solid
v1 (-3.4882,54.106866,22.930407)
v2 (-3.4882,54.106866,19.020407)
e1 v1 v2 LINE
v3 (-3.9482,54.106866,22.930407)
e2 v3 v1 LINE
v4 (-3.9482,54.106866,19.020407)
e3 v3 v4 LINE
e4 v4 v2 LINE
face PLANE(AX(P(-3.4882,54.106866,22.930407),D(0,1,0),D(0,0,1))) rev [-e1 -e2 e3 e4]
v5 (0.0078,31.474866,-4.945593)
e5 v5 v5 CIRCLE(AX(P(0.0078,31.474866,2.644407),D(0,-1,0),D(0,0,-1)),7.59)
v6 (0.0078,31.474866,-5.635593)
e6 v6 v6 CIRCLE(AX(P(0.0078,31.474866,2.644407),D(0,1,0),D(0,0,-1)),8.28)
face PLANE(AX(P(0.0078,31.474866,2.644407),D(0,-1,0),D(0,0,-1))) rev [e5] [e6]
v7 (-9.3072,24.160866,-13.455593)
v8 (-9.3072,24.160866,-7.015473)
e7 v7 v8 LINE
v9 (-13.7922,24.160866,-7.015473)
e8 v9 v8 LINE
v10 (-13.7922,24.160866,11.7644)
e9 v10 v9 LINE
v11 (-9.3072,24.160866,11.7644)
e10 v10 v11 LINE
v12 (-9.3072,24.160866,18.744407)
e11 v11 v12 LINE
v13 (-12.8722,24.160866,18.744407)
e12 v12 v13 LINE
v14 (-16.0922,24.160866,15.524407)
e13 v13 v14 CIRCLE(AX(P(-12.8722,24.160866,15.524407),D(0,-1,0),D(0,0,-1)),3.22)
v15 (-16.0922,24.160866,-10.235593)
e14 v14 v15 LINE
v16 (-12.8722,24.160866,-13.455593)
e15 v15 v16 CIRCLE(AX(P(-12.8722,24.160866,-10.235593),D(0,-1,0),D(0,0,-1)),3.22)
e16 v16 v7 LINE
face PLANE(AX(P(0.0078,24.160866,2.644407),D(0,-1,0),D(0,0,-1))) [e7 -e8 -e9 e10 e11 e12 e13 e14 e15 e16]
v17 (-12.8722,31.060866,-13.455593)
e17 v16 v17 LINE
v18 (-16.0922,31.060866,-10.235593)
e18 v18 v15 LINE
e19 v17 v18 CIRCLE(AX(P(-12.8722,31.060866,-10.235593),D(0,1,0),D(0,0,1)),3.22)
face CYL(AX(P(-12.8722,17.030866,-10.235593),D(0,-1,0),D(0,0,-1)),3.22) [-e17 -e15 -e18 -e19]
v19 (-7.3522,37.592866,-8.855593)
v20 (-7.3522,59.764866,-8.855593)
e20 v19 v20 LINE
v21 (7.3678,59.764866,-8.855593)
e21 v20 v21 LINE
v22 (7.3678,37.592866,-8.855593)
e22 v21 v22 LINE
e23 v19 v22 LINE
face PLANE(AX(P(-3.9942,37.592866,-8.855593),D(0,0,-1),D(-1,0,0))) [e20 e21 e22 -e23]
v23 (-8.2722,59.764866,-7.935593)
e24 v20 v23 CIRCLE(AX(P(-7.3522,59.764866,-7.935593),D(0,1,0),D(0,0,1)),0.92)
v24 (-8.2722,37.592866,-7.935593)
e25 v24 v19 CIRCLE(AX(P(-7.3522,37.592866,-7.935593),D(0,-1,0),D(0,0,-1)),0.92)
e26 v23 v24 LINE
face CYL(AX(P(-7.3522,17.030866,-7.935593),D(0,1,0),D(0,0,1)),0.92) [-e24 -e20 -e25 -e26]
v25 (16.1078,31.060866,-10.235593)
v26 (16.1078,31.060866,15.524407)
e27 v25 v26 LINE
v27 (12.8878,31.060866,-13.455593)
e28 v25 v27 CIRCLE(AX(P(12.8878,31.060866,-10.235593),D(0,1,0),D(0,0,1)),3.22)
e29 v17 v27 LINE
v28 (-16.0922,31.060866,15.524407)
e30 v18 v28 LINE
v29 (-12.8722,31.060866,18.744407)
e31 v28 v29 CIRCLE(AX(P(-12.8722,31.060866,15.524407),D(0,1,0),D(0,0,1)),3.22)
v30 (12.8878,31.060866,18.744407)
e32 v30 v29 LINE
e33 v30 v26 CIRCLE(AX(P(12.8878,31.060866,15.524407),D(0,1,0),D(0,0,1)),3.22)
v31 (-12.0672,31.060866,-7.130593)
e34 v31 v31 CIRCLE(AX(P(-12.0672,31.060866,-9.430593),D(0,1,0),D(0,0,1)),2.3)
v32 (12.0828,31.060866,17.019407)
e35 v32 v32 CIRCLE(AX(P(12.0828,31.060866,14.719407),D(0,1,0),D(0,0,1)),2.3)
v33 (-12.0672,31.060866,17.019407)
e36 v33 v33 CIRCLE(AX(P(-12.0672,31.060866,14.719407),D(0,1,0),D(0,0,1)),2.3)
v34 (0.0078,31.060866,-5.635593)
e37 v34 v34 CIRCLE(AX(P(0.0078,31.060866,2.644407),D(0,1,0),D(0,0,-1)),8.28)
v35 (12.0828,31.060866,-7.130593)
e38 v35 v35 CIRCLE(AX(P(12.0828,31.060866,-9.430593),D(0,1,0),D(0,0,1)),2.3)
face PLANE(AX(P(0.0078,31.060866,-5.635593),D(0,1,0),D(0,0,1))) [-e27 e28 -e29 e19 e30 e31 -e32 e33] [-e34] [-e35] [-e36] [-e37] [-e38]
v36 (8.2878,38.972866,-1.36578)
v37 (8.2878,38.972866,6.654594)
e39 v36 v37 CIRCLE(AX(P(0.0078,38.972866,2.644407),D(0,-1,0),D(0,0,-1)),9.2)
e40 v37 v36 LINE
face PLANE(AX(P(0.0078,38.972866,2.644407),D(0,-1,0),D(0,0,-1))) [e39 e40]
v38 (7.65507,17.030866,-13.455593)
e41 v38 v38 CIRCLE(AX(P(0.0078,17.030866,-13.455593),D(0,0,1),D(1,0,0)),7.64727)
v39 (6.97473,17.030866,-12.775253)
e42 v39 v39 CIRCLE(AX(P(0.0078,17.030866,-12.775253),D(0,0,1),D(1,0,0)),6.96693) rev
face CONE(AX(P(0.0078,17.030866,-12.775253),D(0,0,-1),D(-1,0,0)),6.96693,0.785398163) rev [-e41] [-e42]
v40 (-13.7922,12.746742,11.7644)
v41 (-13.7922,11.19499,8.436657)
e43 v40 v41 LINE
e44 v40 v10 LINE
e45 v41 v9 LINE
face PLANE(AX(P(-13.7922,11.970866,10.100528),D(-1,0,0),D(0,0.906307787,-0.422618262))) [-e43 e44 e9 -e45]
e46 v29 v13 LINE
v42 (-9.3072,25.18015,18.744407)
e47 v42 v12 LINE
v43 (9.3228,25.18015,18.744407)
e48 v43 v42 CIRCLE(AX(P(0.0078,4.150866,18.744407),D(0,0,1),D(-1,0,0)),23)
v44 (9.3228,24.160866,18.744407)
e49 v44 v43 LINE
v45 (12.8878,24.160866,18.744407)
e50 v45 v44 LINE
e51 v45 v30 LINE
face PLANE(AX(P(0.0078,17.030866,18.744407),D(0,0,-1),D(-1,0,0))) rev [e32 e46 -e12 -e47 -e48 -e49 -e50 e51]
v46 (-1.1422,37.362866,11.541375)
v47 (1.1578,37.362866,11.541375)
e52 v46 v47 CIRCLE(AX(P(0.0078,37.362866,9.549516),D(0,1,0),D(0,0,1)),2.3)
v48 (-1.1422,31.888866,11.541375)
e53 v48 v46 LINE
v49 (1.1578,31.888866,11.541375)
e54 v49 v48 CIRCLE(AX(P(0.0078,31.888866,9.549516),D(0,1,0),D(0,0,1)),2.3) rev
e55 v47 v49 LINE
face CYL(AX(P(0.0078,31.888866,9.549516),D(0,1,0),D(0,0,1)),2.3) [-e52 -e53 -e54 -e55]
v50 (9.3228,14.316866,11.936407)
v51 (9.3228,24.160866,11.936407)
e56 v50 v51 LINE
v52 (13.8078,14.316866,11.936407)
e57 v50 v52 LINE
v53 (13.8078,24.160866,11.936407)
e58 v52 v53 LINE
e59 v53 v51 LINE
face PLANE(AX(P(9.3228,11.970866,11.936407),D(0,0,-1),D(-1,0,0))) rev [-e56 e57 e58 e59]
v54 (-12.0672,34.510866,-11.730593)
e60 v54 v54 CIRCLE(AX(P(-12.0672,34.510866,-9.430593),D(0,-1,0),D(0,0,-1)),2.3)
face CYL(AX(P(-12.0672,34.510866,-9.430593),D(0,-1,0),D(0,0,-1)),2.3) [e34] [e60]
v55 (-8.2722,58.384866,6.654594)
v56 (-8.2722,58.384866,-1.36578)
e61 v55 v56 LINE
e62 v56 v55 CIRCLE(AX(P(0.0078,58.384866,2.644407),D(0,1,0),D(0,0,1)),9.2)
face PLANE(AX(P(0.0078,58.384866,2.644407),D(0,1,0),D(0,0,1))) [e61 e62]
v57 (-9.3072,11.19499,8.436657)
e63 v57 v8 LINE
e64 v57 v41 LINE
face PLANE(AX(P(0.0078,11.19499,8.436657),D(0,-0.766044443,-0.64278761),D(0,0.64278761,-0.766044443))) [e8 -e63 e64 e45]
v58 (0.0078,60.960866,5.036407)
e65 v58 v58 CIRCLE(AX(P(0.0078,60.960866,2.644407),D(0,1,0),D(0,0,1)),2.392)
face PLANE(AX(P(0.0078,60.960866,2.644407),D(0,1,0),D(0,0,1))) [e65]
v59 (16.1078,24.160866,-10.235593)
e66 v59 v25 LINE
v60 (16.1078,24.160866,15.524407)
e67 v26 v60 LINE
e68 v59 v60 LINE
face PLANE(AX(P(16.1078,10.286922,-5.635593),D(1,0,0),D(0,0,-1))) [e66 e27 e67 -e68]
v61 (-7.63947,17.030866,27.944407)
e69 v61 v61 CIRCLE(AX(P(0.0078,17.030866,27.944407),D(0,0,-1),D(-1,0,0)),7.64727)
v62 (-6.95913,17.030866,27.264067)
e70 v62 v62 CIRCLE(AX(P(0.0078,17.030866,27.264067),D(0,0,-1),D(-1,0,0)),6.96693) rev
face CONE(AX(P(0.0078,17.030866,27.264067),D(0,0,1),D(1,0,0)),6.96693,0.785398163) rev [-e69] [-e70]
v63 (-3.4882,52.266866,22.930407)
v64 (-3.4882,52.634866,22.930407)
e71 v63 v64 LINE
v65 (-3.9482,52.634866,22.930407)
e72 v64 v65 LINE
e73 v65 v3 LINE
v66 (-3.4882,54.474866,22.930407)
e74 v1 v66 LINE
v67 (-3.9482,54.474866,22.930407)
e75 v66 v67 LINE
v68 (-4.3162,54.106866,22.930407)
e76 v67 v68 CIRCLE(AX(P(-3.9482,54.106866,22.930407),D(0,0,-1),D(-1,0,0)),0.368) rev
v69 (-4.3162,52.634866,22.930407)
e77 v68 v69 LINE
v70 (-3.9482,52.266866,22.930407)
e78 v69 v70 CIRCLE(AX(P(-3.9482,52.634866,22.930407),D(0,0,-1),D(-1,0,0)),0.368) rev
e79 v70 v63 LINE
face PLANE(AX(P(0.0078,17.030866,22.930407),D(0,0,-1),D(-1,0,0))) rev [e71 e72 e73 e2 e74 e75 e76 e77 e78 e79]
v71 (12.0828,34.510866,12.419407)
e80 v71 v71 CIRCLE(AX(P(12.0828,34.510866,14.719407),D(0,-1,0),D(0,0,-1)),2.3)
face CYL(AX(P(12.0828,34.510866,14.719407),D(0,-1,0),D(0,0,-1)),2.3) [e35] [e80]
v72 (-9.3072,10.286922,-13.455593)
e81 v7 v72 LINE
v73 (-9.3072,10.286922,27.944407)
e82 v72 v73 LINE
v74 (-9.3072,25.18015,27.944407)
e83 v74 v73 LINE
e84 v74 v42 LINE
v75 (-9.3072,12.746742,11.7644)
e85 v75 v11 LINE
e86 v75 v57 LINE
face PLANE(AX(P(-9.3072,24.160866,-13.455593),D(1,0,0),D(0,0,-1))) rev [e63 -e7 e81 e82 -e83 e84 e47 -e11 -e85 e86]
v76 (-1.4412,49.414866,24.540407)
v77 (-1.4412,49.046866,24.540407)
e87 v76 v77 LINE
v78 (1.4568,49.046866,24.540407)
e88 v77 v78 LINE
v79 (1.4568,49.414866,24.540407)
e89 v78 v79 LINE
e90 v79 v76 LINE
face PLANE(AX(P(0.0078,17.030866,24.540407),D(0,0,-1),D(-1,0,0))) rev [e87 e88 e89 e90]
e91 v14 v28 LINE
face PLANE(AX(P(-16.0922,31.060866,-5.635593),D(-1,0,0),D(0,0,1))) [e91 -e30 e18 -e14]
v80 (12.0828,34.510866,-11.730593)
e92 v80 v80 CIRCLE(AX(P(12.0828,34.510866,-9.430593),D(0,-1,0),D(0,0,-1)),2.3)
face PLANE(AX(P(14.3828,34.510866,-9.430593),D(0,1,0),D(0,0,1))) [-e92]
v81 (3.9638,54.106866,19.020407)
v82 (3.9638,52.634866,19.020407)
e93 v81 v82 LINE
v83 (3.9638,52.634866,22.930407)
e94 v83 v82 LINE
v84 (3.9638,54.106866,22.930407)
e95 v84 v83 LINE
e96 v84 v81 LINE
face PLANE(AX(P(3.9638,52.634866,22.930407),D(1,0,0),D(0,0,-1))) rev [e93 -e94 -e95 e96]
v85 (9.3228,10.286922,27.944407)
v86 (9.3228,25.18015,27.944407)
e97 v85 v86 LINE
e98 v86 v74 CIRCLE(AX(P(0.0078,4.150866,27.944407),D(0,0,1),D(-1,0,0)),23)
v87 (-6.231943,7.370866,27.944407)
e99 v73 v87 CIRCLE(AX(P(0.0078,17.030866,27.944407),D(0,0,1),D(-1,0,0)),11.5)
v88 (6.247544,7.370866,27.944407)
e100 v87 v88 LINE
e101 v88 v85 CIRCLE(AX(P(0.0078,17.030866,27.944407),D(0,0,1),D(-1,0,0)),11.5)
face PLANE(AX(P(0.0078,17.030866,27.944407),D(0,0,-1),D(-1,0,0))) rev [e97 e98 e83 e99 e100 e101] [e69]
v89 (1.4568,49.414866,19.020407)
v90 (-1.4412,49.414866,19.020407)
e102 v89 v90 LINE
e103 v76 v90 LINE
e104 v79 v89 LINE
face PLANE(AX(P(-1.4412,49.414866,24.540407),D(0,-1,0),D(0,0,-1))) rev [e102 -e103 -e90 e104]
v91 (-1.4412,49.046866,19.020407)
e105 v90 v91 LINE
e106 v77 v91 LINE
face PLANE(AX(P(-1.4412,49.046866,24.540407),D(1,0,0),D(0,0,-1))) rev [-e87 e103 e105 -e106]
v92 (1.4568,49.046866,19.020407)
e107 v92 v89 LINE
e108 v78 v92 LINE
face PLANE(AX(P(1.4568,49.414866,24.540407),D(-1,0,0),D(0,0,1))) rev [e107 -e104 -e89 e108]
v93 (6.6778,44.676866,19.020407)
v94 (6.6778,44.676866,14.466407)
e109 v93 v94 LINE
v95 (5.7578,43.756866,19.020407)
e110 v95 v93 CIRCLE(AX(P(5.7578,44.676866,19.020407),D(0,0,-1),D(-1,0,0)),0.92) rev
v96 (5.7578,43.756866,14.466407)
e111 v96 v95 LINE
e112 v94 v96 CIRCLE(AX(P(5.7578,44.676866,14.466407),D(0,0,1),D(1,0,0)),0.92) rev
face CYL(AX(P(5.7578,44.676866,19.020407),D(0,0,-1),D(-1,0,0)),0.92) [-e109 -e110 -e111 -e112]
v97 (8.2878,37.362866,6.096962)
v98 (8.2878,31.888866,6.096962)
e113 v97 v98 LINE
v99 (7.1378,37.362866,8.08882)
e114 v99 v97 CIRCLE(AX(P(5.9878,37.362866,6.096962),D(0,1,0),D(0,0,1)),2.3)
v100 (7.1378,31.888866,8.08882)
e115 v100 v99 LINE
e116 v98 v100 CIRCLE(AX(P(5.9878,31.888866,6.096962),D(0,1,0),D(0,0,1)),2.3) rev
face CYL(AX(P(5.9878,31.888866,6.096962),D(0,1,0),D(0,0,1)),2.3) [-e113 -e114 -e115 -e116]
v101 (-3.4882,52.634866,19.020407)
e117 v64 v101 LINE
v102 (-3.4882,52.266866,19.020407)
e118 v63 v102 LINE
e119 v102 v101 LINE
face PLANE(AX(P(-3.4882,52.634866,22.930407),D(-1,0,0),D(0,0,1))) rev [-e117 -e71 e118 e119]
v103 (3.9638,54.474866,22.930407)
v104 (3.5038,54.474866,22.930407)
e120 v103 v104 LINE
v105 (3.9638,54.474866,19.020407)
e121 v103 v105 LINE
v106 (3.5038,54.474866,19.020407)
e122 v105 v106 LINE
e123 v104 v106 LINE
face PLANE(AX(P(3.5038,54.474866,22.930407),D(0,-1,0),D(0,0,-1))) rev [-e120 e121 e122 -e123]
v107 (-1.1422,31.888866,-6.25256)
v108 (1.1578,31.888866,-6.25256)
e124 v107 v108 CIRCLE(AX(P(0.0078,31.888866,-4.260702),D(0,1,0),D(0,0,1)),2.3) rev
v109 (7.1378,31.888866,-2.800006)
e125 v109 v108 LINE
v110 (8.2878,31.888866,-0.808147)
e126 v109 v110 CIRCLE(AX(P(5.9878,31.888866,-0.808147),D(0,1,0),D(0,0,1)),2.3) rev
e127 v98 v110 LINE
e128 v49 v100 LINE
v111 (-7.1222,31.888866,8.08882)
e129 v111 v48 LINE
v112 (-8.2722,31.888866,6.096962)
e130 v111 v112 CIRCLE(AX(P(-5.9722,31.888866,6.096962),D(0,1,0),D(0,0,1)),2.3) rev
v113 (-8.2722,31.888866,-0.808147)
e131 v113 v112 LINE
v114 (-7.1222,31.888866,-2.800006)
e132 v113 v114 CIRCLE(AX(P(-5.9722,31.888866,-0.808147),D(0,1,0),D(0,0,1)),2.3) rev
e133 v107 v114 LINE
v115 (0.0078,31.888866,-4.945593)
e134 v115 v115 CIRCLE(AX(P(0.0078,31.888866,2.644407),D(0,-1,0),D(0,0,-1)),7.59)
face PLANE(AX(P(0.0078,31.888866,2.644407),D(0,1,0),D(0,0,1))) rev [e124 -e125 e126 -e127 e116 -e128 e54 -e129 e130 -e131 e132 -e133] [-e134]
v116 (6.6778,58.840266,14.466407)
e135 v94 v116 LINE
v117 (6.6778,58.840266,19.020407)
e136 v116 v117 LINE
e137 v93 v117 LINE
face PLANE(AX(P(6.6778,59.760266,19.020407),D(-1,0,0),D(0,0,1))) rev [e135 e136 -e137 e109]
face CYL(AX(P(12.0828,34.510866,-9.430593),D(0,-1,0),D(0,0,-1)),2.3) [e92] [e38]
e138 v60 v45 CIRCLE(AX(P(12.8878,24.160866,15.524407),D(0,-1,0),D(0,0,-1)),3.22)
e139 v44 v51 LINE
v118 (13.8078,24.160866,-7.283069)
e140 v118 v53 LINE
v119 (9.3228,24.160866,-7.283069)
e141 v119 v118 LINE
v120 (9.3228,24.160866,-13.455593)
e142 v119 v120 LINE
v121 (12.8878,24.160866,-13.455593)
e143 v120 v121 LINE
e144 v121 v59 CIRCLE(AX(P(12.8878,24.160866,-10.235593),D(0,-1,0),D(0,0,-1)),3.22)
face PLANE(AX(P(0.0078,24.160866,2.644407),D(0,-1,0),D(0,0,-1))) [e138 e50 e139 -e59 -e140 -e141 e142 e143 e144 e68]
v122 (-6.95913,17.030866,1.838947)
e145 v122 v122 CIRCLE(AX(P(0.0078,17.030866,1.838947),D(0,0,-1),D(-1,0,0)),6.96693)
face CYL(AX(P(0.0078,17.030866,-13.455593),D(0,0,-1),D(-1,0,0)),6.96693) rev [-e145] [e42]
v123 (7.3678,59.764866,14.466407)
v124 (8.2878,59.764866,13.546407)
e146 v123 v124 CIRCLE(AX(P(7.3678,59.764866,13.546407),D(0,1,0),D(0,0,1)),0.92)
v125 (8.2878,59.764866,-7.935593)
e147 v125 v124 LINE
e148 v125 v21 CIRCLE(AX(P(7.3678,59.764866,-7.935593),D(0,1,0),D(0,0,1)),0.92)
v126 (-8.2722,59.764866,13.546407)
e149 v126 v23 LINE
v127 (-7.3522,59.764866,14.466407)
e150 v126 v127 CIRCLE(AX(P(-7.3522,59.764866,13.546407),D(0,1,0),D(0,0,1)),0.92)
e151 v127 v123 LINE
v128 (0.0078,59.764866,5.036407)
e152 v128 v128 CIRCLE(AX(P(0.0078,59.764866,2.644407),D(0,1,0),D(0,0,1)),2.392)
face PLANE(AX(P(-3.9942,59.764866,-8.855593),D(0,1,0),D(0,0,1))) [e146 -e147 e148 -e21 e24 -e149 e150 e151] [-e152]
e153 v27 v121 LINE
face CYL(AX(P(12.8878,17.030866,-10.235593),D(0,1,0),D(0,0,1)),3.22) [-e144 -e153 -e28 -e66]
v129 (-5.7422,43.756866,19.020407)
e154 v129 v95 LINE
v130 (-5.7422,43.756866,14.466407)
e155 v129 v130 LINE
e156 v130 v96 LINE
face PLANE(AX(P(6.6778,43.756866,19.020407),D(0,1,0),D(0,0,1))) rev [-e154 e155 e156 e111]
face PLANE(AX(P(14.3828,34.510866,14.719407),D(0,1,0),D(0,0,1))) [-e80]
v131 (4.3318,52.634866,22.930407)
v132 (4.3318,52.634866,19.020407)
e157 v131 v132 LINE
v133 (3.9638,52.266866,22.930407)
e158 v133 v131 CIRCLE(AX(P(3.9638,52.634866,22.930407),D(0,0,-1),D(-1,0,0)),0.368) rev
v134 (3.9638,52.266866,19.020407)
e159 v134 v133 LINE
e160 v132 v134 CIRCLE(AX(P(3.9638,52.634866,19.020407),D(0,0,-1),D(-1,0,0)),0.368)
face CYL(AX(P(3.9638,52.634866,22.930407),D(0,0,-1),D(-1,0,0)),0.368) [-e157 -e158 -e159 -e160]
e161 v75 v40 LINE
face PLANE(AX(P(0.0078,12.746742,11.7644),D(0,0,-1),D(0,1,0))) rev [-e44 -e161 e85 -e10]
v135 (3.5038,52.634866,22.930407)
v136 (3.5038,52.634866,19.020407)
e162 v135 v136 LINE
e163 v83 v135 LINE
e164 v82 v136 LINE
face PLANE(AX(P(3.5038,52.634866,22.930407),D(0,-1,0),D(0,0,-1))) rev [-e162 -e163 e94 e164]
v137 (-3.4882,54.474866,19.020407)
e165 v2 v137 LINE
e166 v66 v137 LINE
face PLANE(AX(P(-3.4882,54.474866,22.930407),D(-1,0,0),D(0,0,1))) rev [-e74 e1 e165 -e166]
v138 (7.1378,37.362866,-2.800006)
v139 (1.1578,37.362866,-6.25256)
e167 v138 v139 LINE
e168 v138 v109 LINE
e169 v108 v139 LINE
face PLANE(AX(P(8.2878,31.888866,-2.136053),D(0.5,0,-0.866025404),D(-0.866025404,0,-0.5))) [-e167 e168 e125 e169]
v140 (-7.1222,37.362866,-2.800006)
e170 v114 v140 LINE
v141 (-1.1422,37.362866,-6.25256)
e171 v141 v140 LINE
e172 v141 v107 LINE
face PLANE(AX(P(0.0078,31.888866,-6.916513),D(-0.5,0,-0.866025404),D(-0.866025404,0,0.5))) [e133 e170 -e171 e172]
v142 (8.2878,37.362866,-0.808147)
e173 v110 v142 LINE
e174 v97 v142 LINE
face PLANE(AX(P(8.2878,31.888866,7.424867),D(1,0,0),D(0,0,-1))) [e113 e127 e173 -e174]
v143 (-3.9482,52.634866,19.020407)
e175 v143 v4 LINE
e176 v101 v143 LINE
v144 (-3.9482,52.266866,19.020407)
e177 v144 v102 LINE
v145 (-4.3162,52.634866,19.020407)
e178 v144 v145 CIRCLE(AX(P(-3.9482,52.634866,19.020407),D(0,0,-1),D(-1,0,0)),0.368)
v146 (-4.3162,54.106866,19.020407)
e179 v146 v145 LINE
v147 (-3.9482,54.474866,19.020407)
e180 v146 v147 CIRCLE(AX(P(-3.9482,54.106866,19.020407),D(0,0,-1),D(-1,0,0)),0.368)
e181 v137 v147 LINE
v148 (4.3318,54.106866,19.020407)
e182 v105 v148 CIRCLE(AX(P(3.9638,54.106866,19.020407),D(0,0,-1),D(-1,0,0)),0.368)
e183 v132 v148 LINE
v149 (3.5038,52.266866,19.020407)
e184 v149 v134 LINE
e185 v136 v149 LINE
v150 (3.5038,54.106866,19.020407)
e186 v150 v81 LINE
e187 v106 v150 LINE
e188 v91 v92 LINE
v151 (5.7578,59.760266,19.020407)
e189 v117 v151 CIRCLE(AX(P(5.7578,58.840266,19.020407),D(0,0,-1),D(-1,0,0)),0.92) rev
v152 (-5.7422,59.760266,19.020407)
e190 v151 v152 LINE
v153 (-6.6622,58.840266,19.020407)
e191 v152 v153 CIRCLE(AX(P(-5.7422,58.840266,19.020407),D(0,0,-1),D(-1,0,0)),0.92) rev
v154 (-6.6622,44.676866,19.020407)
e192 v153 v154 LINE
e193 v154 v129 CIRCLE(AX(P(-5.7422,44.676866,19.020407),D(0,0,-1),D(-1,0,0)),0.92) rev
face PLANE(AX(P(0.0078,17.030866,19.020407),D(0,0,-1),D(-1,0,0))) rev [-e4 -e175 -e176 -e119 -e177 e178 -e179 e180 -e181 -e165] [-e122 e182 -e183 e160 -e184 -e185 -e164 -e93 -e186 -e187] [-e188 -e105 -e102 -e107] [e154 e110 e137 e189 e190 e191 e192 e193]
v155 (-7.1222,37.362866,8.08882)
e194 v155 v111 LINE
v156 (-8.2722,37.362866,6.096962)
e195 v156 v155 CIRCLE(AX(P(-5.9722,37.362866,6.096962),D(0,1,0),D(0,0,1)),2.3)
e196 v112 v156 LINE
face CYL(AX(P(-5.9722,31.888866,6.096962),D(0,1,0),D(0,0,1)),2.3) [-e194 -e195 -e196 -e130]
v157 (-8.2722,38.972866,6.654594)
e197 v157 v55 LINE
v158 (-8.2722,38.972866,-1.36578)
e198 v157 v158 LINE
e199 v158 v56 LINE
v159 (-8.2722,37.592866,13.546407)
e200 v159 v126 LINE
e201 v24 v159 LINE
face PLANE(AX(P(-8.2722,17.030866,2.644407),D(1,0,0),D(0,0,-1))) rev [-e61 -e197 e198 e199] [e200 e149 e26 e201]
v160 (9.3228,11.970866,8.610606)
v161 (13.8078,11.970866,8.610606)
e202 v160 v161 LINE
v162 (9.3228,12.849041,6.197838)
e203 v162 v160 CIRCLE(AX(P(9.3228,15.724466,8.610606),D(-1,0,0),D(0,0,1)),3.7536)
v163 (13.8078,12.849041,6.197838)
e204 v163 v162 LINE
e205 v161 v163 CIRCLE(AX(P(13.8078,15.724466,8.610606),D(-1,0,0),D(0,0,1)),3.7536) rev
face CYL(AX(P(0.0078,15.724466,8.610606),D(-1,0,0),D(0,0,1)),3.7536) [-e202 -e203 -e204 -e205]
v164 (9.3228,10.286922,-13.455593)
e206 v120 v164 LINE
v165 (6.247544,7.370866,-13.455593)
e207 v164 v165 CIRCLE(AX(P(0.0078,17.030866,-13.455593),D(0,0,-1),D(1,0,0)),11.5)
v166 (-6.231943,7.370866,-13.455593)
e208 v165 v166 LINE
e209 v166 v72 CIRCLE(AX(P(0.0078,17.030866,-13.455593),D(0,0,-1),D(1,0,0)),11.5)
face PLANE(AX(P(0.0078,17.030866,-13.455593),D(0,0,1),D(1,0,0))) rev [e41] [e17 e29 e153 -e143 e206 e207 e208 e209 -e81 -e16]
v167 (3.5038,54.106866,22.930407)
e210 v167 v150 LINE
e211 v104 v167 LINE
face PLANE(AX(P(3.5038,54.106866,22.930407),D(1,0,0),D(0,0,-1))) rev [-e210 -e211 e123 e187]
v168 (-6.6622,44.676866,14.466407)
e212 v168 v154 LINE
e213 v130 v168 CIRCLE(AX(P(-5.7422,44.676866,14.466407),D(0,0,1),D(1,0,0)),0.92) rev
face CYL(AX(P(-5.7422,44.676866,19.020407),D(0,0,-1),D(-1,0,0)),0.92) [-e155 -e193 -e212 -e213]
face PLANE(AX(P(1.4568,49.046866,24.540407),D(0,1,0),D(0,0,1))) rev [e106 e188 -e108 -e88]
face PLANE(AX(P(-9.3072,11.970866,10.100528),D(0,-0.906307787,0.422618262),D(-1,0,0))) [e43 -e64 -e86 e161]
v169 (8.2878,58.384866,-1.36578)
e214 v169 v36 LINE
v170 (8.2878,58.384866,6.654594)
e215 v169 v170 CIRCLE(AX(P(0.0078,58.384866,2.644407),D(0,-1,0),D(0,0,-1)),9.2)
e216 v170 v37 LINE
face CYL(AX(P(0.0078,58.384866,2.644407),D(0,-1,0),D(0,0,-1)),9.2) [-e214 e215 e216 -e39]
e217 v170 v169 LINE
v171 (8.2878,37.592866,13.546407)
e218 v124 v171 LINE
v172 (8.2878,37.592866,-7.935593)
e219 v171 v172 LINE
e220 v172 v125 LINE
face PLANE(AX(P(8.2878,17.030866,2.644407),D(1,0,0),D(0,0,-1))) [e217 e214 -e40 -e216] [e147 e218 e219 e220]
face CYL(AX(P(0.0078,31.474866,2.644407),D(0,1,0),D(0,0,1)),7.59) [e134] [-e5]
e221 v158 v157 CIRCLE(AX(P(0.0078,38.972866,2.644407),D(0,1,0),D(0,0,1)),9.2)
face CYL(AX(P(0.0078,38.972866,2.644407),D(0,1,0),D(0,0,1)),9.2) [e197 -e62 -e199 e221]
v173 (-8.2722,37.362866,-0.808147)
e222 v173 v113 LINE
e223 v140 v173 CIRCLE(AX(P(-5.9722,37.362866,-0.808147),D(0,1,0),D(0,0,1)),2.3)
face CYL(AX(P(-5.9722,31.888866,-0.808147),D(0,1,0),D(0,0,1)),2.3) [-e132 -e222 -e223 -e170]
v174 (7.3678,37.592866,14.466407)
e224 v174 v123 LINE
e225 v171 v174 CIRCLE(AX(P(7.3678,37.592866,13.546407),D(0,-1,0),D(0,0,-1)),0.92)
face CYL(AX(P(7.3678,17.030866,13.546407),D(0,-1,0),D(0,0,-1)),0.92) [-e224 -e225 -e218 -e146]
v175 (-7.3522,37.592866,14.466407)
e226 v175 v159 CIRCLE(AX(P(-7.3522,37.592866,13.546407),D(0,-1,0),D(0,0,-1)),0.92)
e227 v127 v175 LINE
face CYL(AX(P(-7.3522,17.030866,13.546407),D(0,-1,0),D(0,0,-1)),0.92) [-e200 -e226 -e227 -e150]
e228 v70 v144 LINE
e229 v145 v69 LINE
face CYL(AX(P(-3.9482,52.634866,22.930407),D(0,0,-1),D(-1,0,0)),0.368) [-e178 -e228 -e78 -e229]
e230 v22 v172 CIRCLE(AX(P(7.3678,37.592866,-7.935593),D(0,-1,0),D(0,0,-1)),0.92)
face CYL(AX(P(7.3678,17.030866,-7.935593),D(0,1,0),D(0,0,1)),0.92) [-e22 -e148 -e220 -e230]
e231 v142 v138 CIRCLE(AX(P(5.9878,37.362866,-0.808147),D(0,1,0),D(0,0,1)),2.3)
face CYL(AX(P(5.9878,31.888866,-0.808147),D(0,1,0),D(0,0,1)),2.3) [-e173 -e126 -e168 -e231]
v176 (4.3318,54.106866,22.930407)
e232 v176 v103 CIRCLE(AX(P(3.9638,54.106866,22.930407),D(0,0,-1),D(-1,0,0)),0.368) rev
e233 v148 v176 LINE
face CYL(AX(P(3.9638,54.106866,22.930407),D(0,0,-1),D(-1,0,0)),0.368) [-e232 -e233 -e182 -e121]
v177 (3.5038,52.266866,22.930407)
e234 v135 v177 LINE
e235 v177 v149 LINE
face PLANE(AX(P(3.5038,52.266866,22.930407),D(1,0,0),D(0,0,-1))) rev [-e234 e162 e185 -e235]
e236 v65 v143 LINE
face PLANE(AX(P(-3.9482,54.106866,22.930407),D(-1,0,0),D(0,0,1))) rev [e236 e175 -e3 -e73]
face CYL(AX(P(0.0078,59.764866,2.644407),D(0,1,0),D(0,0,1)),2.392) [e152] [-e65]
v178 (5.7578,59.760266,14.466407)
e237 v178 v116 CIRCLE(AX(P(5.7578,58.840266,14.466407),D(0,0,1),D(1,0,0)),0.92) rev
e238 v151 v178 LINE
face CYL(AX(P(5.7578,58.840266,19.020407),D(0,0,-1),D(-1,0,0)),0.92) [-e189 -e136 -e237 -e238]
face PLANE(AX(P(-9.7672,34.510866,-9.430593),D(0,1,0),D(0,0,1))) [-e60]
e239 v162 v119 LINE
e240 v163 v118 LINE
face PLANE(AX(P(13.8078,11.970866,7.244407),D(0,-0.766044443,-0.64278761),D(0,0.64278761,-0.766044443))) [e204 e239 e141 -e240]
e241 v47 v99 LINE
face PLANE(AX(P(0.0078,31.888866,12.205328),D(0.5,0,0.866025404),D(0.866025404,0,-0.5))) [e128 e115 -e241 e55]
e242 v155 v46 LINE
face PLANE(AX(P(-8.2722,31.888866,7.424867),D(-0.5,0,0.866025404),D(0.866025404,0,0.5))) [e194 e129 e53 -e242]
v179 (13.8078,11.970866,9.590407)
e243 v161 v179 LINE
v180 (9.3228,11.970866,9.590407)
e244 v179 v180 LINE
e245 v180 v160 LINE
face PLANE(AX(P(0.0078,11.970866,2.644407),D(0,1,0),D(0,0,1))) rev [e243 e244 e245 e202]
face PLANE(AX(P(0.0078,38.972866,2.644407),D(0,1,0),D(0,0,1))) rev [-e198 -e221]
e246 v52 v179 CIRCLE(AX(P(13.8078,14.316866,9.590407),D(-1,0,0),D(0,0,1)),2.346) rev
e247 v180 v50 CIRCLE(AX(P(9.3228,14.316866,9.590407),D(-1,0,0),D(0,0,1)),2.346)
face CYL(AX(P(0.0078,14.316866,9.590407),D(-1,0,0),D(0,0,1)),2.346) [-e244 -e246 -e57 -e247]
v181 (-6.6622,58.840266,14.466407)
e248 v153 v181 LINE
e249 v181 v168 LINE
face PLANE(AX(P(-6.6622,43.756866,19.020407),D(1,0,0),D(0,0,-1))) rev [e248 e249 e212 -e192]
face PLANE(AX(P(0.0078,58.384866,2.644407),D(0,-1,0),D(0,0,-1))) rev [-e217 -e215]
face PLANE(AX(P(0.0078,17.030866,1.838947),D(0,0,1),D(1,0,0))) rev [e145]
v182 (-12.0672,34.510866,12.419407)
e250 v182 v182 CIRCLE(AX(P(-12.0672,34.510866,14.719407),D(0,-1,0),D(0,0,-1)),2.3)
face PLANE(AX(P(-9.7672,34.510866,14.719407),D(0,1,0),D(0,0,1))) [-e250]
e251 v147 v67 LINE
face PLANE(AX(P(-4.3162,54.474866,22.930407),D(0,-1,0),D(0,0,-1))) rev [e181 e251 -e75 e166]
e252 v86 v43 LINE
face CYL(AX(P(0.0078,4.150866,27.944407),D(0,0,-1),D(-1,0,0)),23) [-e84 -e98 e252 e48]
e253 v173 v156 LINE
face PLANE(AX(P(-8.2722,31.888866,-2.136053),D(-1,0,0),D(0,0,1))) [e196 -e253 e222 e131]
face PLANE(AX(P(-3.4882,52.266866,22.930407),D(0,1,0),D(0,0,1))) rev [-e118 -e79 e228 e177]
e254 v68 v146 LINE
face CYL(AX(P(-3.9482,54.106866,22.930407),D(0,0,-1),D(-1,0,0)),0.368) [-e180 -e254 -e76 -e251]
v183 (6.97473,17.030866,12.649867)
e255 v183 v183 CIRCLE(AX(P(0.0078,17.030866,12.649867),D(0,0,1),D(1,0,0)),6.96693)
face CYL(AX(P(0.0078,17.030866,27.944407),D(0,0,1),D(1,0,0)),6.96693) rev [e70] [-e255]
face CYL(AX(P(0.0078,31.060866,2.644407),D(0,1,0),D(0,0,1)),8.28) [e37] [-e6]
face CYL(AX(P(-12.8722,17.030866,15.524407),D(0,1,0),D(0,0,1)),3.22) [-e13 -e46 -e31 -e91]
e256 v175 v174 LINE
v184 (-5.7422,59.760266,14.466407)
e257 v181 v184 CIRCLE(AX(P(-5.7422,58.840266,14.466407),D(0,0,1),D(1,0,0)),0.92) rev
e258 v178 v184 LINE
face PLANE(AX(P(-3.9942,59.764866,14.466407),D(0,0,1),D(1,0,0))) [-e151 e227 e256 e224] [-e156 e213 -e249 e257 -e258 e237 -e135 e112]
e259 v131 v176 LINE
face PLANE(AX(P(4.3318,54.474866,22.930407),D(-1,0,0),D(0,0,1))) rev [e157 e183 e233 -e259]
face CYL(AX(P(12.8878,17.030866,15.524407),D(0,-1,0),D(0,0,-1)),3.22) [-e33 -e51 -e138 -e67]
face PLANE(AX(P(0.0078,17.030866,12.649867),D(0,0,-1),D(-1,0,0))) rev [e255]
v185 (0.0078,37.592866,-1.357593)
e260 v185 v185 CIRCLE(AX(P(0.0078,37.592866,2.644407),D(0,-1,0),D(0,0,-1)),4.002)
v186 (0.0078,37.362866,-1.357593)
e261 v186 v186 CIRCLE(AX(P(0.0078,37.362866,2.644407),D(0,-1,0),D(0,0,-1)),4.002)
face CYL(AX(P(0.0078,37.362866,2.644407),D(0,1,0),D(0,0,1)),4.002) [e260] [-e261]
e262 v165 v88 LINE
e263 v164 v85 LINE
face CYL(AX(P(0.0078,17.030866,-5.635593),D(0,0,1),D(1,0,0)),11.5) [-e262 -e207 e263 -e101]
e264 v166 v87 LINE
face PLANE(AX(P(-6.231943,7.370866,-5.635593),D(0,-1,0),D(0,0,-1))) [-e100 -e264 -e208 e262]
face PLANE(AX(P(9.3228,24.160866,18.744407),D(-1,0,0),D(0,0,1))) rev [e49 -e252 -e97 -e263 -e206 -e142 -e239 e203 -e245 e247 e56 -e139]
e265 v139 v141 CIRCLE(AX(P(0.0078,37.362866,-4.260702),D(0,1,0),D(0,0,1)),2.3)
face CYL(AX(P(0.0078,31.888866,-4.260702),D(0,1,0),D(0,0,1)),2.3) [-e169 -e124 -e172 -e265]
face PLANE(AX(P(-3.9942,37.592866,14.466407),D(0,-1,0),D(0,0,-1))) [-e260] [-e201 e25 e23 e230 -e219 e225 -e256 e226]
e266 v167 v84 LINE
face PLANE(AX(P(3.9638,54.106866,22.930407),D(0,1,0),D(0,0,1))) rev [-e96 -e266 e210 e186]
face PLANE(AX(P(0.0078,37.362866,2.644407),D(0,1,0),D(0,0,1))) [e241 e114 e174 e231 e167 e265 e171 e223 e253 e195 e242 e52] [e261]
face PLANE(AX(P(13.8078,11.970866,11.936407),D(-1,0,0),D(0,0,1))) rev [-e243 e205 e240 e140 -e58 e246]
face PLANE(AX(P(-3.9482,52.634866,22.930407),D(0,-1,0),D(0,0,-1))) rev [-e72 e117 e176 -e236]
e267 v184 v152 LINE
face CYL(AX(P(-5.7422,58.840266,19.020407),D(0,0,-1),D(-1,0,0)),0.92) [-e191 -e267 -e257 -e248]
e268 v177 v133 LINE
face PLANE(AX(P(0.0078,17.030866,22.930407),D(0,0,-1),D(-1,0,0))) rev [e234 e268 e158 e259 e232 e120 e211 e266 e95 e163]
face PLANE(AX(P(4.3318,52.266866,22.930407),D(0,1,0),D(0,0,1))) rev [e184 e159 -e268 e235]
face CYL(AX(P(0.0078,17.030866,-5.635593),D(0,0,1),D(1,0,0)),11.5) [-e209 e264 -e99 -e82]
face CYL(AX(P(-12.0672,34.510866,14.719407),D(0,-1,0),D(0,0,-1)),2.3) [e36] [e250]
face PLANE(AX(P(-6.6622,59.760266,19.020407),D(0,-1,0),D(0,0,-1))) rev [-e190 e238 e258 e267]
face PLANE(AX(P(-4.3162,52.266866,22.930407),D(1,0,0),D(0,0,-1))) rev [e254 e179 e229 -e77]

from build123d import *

# Parameters (mm, degrees)
IZIM1_W                      = 50.7
IZIM1_H                      = 48.2
Y_KSEKLIK_EKSTR_ZYON1_DEPTH  = 26.7
IZIM2_R                      = 8.7
Y_KSEKLIK_EKSTR_ZYON2_DEPTH  = 0.5
Y_KSEKLIK_EKSTR_ZYON3_DEPTH  = 11.9
IZIM4_R                      = 16.5
Y_KSEKLIK_EKSTR_ZYON4_DEPTH  = 0.9
IZIM5_R                      = 18
Y_KSEKLIK_EKSTR_ZYON5_DEPTH  = 0.9
Y_KSEKLIK_EKSTR_ZYON6_DEPTH  = 36
Y_KSEKLIK_EKSTR_ZYON7_DEPTH  = 17
Y_KSEKLIK_EKSTR_ZYON8_START  = 17
Y_KSEKLIK_EKSTR_ZYON8_DEPTH  = 17
IZIM9_W                      = 14.75
IZIM9_H                      = 70
KES_EKSTR_ZYON1_DEPTH        = 30.160746911
IZIM10_W                     = 14.75
IZIM10_H                     = 70
KES_EKSTR_ZYON2_DEPTH        = 30.160746911
IZIM11_W                     = 50.7
IZIM11_H                     = 48.2
Y_KSEKLIK_EKSTR_ZYON9_DEPTH  = 9.3
Y_KSEKLIK_EKSTR_ZYON10_START = 20
Y_KSEKLIK_EKSTR_ZYON10_DEPTH = 20
IZIM13_W                     = 9.75
IZIM13_H                     = 10.2
Y_KSEKLIK_EKSTR_ZYON11_DEPTH = 26.5
Y_KSEKLIK_EKSTR_ZYON12_DEPTH = 42.2
Y_KSEKLIK_EKSTR_ZYON13_START = -42.2
Y_KSEKLIK_EKSTR_ZYON13_DEPTH = 42.2
IZIM16_W                     = 29
IZIM16_H                     = 34.79
Y_KSEKLIK_EKSTR_ZYON14_DEPTH = 9.9
Y_KSEKLIK_EKSTR_ZYON15_DEPTH = 8.5
Y_KSEKLIK_EKSTR_ZYON16_DEPTH = 8.5
IZIM19_W                     = 6.3
IZIM19_H                     = 0.8
Y_KSEKLIK_EKSTR_ZYON17_DEPTH = 12
DRAFT1_ANGLE                 = 50
IZIM20_W                     = 5
IZIM20_H                     = 7.5
IZIM21_W                     = 5
IZIM21_H                     = 7.5
IZIM22_W                     = 5
IZIM22_H                     = 7.5
IZIM23_W                     = 5
IZIM23_H                     = 7.5
IZIM24_W                     = 5.2
IZIM24_H                     = 2.6
M27_BO_LUKLU_DELIK1_D        = 30.291
M27_BO_LUKLU_DELIK1_DEPTH    = 33.249
M27_BO_LUKLU_DELIK2_D        = 30.291
M27_BO_LUKLU_DELIK2_DEPTH    = 33.249
FEDER1_START                 = -30
FEDER1_DEPTH                 = 9.75
PAH1_SIZE                    = 1.479
RADYUS1_R                    = 0.8
RADYUS2_R                    = 2
RADYUS3_R                    = 5
RADYUS4_R                    = 5.1
RADYUS5_R                    = 7
RADYUS6_R                    = 8.16
L_EK1_SCALE                  = 0.46


# Read off the part's stored shape, not the designer's step: Feder1
with BuildPart() as part:
    # Çizim1 → Yükseklik-Ekstrüzyon1 (new body)
    with BuildSketch(Plane(origin=(18, 0, 0), x_dir=(0, 0, -1), z_dir=(1, 0, 0))):
        with Locations((-0.35, 68.8)):
            Rectangle(IZIM1_W, IZIM1_H)
    extrude(amount=-Y_KSEKLIK_EKSTR_ZYON1_DEPTH)

    # Çizim2 → Yükseklik-Ekstrüzyon2 (add)
    with BuildSketch(Plane.XZ.offset(-44.7)):
        with Locations(Location((0, 0, 0), (0, 0, 180))):
            Circle(IZIM2_R)
    extrude(amount=Y_KSEKLIK_EKSTR_ZYON2_DEPTH)

    # Çizim3 → Yükseklik-Ekstrüzyon3 (add)
    with BuildSketch(Plane(origin=(0, 44.2, 0), x_dir=(1, 0, 0), z_dir=(0, 1, 0))):
        Polygon((-18, 10.392304845), (-18, -10.392304845), (0, -20.784609691), (18, -10.392304845), (18, 10.392304845), (0, 20.784609691), align=None)
    extrude(amount=-Y_KSEKLIK_EKSTR_ZYON3_DEPTH)

    # Çizim4 → Yükseklik-Ekstrüzyon4 (add)
    with BuildSketch(Plane.XZ.offset(-32.3)):
        with Locations(Location((0, 0, 0), (0, 0, 270))):
            Circle(IZIM4_R)
    extrude(amount=Y_KSEKLIK_EKSTR_ZYON4_DEPTH)

    # Çizim5 → Yükseklik-Ekstrüzyon5 (add)
    with BuildSketch(Plane(origin=(0, 31.4, 0), x_dir=(1, 0, 0), z_dir=(0, 1, 0))):
        with Locations(Location((0, 0, 0), (0, 0, 90))):
            Circle(IZIM5_R)
    extrude(amount=-Y_KSEKLIK_EKSTR_ZYON5_DEPTH)

    # Çizim6 → Yükseklik-Ekstrüzyon6 (add)
    with BuildSketch(Plane.XY.offset(18)):
        with BuildLine():
            Line((-13.564659966, -21), (13.564659966, -21))
            ThreePointArc((13.564659966, -21), (17.201870235, -18.14099392), (20.25, -14.660746911))
            Line((20.25, -14.660746911), (35, -14.660746911))
            Line((35, -14.660746911), (35, 30.5))
            Line((35, 30.5), (0, 30.5))
            Line((0, 30.5), (-35, 30.5))
            Line((-35, 30.5), (-35, -14.660746911))
            Line((-35, -14.660746911), (-20.25, -14.660746911))
            ThreePointArc((-20.25, -14.660746911), (-17.201870235, -18.14099392), (-13.564659966, -21))
        make_face()
    extrude(amount=-Y_KSEKLIK_EKSTR_ZYON6_DEPTH)

    # Çizim7 → Yükseklik-Ekstrüzyon7 (add)
    with BuildSketch(Plane(origin=(0, 0, -18), x_dir=(-1, 0, 0), z_dir=(0, 0, -1))):
        with BuildLine():
            Line((13.564659966, -21), (-13.564659966, -21))
            ThreePointArc((-13.564659966, -21), (-17.201870235, -18.14099392), (-20.25, -14.660746911))
            Line((-20.25, -14.660746911), (-35, -14.660746911))
            Line((-35, -14.660746911), (-35, 30.5))
            Line((-35, 30.5), (35, 30.5))
            Line((35, 30.5), (35, -14.660746911))
            Line((35, -14.660746911), (20.25, -14.660746911))
            ThreePointArc((20.25, -14.660746911), (17.201870235, -18.14099392), (13.564659966, -21))
        make_face()
    extrude(amount=Y_KSEKLIK_EKSTR_ZYON7_DEPTH)

    # Çizim8 → Yükseklik-Ekstrüzyon8 (add)
    with BuildSketch(Plane.XY.offset(18).offset(Y_KSEKLIK_EKSTR_ZYON8_START)):
        with BuildLine():
            Line((13.564659966, -21), (-13.564659966, -21))
            ThreePointArc((-13.564659966, -21), (-17.201870235, -18.14099392), (-20.25, -14.660746911))
            Line((-20.25, -14.660746911), (-35, -14.660746911))
            Line((-35, -14.660746911), (-35, 30.5))
            Line((-35, 30.5), (35, 30.5))
            Line((35, 30.5), (35, -14.660746911))
            Line((35, -14.660746911), (20.25, -14.660746911))
            ThreePointArc((20.25, -14.660746911), (17.201870235, -18.14099392), (13.564659966, -21))
        make_face()
    extrude(amount=-Y_KSEKLIK_EKSTR_ZYON8_DEPTH)

    # Çizim9 → Kes-Ekstrüzyon1 (cut)
    with BuildSketch(Plane.XZ.offset(14.660746911)):
        with Locations((27.625, 0)):
            Rectangle(IZIM9_W, IZIM9_H)
    extrude(amount=-KES_EKSTR_ZYON1_DEPTH, mode=Mode.SUBTRACT)

    # Çizim10 → Kes-Ekstrüzyon2 (cut)
    with BuildSketch(Plane.XZ.offset(14.660746911)):
        with Locations((-27.625, 0)):
            Rectangle(IZIM10_W, IZIM10_H)
    extrude(amount=-KES_EKSTR_ZYON2_DEPTH, mode=Mode.SUBTRACT)

    # Çizim11 → Yükseklik-Ekstrüzyon9 (add)
    with BuildSketch(Plane.ZY.offset(8.7)):
        with Locations((0.35, 68.8)):
            Rectangle(IZIM11_W, IZIM11_H)
    extrude(amount=Y_KSEKLIK_EKSTR_ZYON9_DEPTH)

    # Çizim12 → Yükseklik-Ekstrüzyon10 (add)
    with BuildSketch(Plane.XY.offset(35).offset(Y_KSEKLIK_EKSTR_ZYON10_START)):
        with BuildLine():
            Line((-20.25, -14.660746911), (-20.25, 17.715834237))
            ThreePointArc((-20.25, 17.715834237), (0, 22), (20.25, 17.715834237))
            Line((20.25, 17.715834237), (20.25, -14.660746911))
            ThreePointArc((20.25, -14.660746911), (17.201870235, -18.14099392), (13.564659966, -21))
            Line((13.564659966, -21), (-13.564659966, -21))
            ThreePointArc((-13.564659966, -21), (-17.201870235, -18.14099392), (-20.25, -14.660746911))
        make_face()
    extrude(amount=-Y_KSEKLIK_EKSTR_ZYON10_DEPTH)

    # Çizim13 → Yükseklik-Ekstrüzyon11 (add)
    with BuildSketch(Plane.XZ.offset(-15.5)):
        with Locations((25.125, 15.1)):
            Rectangle(IZIM13_W, IZIM13_H)
    extrude(amount=Y_KSEKLIK_EKSTR_ZYON11_DEPTH)

    # Çizim14 → Yükseklik-Ekstrüzyon12 (add)
    with BuildSketch(Plane(origin=(0, 89.9, 0), x_dir=(1, 0, 0), z_dir=(0, 1, 0))):
        with BuildLine():
            Line((-18, -8.717797887), (-18, 8.717797887))
            ThreePointArc((-18, 8.717797887), (-20, 0), (-18, -8.717797887))
        make_face()
    extrude(amount=-Y_KSEKLIK_EKSTR_ZYON12_DEPTH)

    # Çizim15 → Yükseklik-Ekstrüzyon13 (add)
    with BuildSketch(Plane.XZ.offset(-47.7).offset(Y_KSEKLIK_EKSTR_ZYON13_START)):
        with BuildLine():
            Line((18, 8.717797887), (18, -8.717797887))
            ThreePointArc((18, -8.717797887), (20, 0), (18, 8.717797887))
        make_face()
    extrude(amount=Y_KSEKLIK_EKSTR_ZYON13_DEPTH)

    # Çizim16 → Yükseklik-Ekstrüzyon14 (add)
    with BuildSketch(Plane.XY.offset(25.7)):
        with Locations((0, 75.495)):
            Rectangle(IZIM16_W, IZIM16_H)
    extrude(amount=Y_KSEKLIK_EKSTR_ZYON14_DEPTH)

    # Çizim17 → Yükseklik-Ekstrüzyon15 (add)
    with BuildSketch(Plane.XY.offset(35.6)):
        Polygon((-9.4, 81.4), (-7.6, 81.4), (-7.6, 80.6), (-8.6, 80.6), (-8.6, 77.4), (-7.6, 77.4), (-7.6, 76.6), (-9.4, 76.6), align=None)
    extrude(amount=Y_KSEKLIK_EKSTR_ZYON15_DEPTH)

    # Çizim18 → Yükseklik-Ekstrüzyon16 (add)
    with BuildSketch(Plane.XY.offset(35.6)):
        Polygon((7.6, 77.4), (8.6, 77.4), (8.6, 80.6), (7.6, 80.6), (7.6, 81.4), (9.4, 81.4), (9.4, 76.6), (7.6, 76.6), align=None)
    extrude(amount=Y_KSEKLIK_EKSTR_ZYON16_DEPTH)

    # Çizim19 → Yükseklik-Ekstrüzyon17 (add)
    with BuildSketch(Plane.XY.offset(35.6)):
        with Locations((0, 70)):
            Rectangle(IZIM19_W, IZIM19_H)
    extrude(amount=Y_KSEKLIK_EKSTR_ZYON17_DEPTH)

    # Draft1
    draft1_faces = [part.faces().sort_by_distance(p)[0] for p in [
        (25.125, 2.25, 10),
    ]]
    draft(draft1_faces, Plane(origin=(0, -11, 0), x_dir=(0, 0, -1), z_dir=(0, -1, 0)), DRAFT1_ANGLE)

    # Çizim20 → Döndür1 (revolve)
    with BuildSketch(Plane.XY.offset(26.25), mode=Mode.PRIVATE) as d_nd_r1_sk:
        with Locations((-23.75, 34.25)):
            Rectangle(IZIM20_W, IZIM20_H)
    revolve(d_nd_r1_sk.sketch.rotate(Axis((-26.25, 38, 26.25), (0, -1, 0)), 270), axis=Axis((-26.25, 38, 26.25), (0, -1, 0)))

    # Çizim21 → Döndür2 (revolve)
    with BuildSketch(Plane.XY.offset(-26.25), mode=Mode.PRIVATE) as d_nd_r2_sk:
        with Locations((-23.75, 34.25)):
            Rectangle(IZIM21_W, IZIM21_H)
    revolve(d_nd_r2_sk.sketch.rotate(Axis((-26.25, 38, -26.25), (0, -1, 0)), 270), axis=Axis((-26.25, 38, -26.25), (0, -1, 0)))

    # Çizim22 → Döndür3 (revolve)
    with BuildSketch(Plane.XY.offset(-26.25), mode=Mode.PRIVATE) as d_nd_r3_sk:
        with Locations((28.75, 34.25)):
            Rectangle(IZIM22_W, IZIM22_H)
    revolve(d_nd_r3_sk.sketch.rotate(Axis((26.25, 38, -26.25), (0, -1, 0)), 270), axis=Axis((26.25, 38, -26.25), (0, -1, 0)))

    # Çizim23 → Döndür4 (revolve)
    with BuildSketch(Plane.XY.offset(26.25), mode=Mode.PRIVATE) as d_nd_r4_sk:
        with Locations((28.75, 34.25)):
            Rectangle(IZIM23_W, IZIM23_H)
    revolve(d_nd_r4_sk.sketch.rotate(Axis((26.25, 38, 26.25), (0, -1, 0)), 270), axis=Axis((26.25, 38, 26.25), (0, -1, 0)))

    # Çizim24 → Döndür5 (revolve)
    with BuildSketch(Plane(origin=(0, 0, 0), x_dir=(-1, 0, 0), z_dir=(0, 0, -1)), mode=Mode.PRIVATE) as d_nd_r5_sk:
        with Locations((-2.6, 94.2)):
            Rectangle(IZIM24_W, IZIM24_H)
    revolve(d_nd_r5_sk.sketch.rotate(Axis((0, 92.9, 0), (0, 1, 0)), 90), axis=Axis((0, 92.9, 0), (0, 1, 0)))

    # M27 Boşluklu Delik1
    with Locations(Plane.XY.offset(55)):
        with Locations((0, 0)):
            Hole(M27_BO_LUKLU_DELIK1_D / 2, depth=M27_BO_LUKLU_DELIK1_DEPTH)

    # M27 Boşluklu Delik2
    with Locations(Plane(origin=(0, 0, -35), x_dir=(-1, 0, 0), z_dir=(0, 0, -1))):
        with Locations((0, 0)):
            Hole(M27_BO_LUKLU_DELIK2_D / 2, depth=M27_BO_LUKLU_DELIK2_DEPTH)

    # Feder1 outline → Feder1 (add)
    with BuildSketch(Plane.YZ.offset(FEDER1_START)):
        Polygon((15.5, 19.826070485), (-9.313312955, 19.826070485), (-12.686687045, 12.591846402), (15.5, -20.999739147), align=None)
    extrude(amount=FEDER1_DEPTH)

    # Pah1
    pah1_edges = [part.edges().sort_by_distance(p)[0] for p in [
        (15.1455, 0, 55),
        (-15.1455, 0, -35),
    ]]
    chamfer(pah1_edges, length=PAH1_SIZE)

    # Radyus1
    radyus1_edges = [part.edges().sort_by_distance(p)[0] for p in [
        (-9.4, 81.4, 39.85),
        (-9.4, 76.6, 39.85),
        (9.4, 76.6, 39.85),
        (9.4, 81.4, 39.85),
    ]]
    fillet(radyus1_edges, radius=RADYUS1_R)

    # Radyus2
    radyus2_edges = [part.edges().sort_by_distance(p)[0] for p in [
        (-18, 68.8, -25),
        (-18, 68.8, 25.7),
        (-14.5, 92.89, 30.65),
        (-14.5, 58.1, 30.65),
        (14.5, 58.1, 30.65),
        (14.5, 92.89, 30.65),
        (18, 68.8, 25.7),
        (18, 68.8, -25),
    ]]
    fillet(radyus2_edges, radius=RADYUS2_R)

    # Radyus3
    radyus3_edges = [part.edges().sort_by_distance(p)[0] for p in [
        (-18, 38.25, -10.392304845),
        (0, 38.25, -20.784609691),
        (18, 38.25, -10.392304845),
        (18, 38.25, 10.392304845),
        (0, 38.25, 20.784609691),
        (-18, 38.25, 10.392304845),
    ]]
    fillet(radyus3_edges, radius=RADYUS3_R)

    # Radyus4
    radyus4_edges = [part.edges().sort_by_distance(p)[0] for p in [
        (25.125, -11, 20.2),
    ]]
    fillet(radyus4_edges, radius=RADYUS4_R)

    # Radyus5
    radyus5_edges = [part.edges().sort_by_distance(p)[0] for p in [
        (35, 23, 35),
        (-35, 23, -35),
        (35, 23, -35),
        (-35, 23, 35),
    ]]
    fillet(radyus5_edges, radius=RADYUS5_R)

    # Radyus6
    radyus6_edges = [part.edges().sort_by_distance(p)[0] for p in [
        (25.125, -11, 10),
    ]]
    fillet(radyus6_edges, radius=RADYUS6_R)


with BuildPart() as part_1:
    # Ölçek1: scaled about (0.014445195, 31.538640435, 4.897050437)
    add(part.part.scale(L_EK1_SCALE).moved(Location((0.007800405, 17.030865835, 2.644407236))))


solid = part_1.part
